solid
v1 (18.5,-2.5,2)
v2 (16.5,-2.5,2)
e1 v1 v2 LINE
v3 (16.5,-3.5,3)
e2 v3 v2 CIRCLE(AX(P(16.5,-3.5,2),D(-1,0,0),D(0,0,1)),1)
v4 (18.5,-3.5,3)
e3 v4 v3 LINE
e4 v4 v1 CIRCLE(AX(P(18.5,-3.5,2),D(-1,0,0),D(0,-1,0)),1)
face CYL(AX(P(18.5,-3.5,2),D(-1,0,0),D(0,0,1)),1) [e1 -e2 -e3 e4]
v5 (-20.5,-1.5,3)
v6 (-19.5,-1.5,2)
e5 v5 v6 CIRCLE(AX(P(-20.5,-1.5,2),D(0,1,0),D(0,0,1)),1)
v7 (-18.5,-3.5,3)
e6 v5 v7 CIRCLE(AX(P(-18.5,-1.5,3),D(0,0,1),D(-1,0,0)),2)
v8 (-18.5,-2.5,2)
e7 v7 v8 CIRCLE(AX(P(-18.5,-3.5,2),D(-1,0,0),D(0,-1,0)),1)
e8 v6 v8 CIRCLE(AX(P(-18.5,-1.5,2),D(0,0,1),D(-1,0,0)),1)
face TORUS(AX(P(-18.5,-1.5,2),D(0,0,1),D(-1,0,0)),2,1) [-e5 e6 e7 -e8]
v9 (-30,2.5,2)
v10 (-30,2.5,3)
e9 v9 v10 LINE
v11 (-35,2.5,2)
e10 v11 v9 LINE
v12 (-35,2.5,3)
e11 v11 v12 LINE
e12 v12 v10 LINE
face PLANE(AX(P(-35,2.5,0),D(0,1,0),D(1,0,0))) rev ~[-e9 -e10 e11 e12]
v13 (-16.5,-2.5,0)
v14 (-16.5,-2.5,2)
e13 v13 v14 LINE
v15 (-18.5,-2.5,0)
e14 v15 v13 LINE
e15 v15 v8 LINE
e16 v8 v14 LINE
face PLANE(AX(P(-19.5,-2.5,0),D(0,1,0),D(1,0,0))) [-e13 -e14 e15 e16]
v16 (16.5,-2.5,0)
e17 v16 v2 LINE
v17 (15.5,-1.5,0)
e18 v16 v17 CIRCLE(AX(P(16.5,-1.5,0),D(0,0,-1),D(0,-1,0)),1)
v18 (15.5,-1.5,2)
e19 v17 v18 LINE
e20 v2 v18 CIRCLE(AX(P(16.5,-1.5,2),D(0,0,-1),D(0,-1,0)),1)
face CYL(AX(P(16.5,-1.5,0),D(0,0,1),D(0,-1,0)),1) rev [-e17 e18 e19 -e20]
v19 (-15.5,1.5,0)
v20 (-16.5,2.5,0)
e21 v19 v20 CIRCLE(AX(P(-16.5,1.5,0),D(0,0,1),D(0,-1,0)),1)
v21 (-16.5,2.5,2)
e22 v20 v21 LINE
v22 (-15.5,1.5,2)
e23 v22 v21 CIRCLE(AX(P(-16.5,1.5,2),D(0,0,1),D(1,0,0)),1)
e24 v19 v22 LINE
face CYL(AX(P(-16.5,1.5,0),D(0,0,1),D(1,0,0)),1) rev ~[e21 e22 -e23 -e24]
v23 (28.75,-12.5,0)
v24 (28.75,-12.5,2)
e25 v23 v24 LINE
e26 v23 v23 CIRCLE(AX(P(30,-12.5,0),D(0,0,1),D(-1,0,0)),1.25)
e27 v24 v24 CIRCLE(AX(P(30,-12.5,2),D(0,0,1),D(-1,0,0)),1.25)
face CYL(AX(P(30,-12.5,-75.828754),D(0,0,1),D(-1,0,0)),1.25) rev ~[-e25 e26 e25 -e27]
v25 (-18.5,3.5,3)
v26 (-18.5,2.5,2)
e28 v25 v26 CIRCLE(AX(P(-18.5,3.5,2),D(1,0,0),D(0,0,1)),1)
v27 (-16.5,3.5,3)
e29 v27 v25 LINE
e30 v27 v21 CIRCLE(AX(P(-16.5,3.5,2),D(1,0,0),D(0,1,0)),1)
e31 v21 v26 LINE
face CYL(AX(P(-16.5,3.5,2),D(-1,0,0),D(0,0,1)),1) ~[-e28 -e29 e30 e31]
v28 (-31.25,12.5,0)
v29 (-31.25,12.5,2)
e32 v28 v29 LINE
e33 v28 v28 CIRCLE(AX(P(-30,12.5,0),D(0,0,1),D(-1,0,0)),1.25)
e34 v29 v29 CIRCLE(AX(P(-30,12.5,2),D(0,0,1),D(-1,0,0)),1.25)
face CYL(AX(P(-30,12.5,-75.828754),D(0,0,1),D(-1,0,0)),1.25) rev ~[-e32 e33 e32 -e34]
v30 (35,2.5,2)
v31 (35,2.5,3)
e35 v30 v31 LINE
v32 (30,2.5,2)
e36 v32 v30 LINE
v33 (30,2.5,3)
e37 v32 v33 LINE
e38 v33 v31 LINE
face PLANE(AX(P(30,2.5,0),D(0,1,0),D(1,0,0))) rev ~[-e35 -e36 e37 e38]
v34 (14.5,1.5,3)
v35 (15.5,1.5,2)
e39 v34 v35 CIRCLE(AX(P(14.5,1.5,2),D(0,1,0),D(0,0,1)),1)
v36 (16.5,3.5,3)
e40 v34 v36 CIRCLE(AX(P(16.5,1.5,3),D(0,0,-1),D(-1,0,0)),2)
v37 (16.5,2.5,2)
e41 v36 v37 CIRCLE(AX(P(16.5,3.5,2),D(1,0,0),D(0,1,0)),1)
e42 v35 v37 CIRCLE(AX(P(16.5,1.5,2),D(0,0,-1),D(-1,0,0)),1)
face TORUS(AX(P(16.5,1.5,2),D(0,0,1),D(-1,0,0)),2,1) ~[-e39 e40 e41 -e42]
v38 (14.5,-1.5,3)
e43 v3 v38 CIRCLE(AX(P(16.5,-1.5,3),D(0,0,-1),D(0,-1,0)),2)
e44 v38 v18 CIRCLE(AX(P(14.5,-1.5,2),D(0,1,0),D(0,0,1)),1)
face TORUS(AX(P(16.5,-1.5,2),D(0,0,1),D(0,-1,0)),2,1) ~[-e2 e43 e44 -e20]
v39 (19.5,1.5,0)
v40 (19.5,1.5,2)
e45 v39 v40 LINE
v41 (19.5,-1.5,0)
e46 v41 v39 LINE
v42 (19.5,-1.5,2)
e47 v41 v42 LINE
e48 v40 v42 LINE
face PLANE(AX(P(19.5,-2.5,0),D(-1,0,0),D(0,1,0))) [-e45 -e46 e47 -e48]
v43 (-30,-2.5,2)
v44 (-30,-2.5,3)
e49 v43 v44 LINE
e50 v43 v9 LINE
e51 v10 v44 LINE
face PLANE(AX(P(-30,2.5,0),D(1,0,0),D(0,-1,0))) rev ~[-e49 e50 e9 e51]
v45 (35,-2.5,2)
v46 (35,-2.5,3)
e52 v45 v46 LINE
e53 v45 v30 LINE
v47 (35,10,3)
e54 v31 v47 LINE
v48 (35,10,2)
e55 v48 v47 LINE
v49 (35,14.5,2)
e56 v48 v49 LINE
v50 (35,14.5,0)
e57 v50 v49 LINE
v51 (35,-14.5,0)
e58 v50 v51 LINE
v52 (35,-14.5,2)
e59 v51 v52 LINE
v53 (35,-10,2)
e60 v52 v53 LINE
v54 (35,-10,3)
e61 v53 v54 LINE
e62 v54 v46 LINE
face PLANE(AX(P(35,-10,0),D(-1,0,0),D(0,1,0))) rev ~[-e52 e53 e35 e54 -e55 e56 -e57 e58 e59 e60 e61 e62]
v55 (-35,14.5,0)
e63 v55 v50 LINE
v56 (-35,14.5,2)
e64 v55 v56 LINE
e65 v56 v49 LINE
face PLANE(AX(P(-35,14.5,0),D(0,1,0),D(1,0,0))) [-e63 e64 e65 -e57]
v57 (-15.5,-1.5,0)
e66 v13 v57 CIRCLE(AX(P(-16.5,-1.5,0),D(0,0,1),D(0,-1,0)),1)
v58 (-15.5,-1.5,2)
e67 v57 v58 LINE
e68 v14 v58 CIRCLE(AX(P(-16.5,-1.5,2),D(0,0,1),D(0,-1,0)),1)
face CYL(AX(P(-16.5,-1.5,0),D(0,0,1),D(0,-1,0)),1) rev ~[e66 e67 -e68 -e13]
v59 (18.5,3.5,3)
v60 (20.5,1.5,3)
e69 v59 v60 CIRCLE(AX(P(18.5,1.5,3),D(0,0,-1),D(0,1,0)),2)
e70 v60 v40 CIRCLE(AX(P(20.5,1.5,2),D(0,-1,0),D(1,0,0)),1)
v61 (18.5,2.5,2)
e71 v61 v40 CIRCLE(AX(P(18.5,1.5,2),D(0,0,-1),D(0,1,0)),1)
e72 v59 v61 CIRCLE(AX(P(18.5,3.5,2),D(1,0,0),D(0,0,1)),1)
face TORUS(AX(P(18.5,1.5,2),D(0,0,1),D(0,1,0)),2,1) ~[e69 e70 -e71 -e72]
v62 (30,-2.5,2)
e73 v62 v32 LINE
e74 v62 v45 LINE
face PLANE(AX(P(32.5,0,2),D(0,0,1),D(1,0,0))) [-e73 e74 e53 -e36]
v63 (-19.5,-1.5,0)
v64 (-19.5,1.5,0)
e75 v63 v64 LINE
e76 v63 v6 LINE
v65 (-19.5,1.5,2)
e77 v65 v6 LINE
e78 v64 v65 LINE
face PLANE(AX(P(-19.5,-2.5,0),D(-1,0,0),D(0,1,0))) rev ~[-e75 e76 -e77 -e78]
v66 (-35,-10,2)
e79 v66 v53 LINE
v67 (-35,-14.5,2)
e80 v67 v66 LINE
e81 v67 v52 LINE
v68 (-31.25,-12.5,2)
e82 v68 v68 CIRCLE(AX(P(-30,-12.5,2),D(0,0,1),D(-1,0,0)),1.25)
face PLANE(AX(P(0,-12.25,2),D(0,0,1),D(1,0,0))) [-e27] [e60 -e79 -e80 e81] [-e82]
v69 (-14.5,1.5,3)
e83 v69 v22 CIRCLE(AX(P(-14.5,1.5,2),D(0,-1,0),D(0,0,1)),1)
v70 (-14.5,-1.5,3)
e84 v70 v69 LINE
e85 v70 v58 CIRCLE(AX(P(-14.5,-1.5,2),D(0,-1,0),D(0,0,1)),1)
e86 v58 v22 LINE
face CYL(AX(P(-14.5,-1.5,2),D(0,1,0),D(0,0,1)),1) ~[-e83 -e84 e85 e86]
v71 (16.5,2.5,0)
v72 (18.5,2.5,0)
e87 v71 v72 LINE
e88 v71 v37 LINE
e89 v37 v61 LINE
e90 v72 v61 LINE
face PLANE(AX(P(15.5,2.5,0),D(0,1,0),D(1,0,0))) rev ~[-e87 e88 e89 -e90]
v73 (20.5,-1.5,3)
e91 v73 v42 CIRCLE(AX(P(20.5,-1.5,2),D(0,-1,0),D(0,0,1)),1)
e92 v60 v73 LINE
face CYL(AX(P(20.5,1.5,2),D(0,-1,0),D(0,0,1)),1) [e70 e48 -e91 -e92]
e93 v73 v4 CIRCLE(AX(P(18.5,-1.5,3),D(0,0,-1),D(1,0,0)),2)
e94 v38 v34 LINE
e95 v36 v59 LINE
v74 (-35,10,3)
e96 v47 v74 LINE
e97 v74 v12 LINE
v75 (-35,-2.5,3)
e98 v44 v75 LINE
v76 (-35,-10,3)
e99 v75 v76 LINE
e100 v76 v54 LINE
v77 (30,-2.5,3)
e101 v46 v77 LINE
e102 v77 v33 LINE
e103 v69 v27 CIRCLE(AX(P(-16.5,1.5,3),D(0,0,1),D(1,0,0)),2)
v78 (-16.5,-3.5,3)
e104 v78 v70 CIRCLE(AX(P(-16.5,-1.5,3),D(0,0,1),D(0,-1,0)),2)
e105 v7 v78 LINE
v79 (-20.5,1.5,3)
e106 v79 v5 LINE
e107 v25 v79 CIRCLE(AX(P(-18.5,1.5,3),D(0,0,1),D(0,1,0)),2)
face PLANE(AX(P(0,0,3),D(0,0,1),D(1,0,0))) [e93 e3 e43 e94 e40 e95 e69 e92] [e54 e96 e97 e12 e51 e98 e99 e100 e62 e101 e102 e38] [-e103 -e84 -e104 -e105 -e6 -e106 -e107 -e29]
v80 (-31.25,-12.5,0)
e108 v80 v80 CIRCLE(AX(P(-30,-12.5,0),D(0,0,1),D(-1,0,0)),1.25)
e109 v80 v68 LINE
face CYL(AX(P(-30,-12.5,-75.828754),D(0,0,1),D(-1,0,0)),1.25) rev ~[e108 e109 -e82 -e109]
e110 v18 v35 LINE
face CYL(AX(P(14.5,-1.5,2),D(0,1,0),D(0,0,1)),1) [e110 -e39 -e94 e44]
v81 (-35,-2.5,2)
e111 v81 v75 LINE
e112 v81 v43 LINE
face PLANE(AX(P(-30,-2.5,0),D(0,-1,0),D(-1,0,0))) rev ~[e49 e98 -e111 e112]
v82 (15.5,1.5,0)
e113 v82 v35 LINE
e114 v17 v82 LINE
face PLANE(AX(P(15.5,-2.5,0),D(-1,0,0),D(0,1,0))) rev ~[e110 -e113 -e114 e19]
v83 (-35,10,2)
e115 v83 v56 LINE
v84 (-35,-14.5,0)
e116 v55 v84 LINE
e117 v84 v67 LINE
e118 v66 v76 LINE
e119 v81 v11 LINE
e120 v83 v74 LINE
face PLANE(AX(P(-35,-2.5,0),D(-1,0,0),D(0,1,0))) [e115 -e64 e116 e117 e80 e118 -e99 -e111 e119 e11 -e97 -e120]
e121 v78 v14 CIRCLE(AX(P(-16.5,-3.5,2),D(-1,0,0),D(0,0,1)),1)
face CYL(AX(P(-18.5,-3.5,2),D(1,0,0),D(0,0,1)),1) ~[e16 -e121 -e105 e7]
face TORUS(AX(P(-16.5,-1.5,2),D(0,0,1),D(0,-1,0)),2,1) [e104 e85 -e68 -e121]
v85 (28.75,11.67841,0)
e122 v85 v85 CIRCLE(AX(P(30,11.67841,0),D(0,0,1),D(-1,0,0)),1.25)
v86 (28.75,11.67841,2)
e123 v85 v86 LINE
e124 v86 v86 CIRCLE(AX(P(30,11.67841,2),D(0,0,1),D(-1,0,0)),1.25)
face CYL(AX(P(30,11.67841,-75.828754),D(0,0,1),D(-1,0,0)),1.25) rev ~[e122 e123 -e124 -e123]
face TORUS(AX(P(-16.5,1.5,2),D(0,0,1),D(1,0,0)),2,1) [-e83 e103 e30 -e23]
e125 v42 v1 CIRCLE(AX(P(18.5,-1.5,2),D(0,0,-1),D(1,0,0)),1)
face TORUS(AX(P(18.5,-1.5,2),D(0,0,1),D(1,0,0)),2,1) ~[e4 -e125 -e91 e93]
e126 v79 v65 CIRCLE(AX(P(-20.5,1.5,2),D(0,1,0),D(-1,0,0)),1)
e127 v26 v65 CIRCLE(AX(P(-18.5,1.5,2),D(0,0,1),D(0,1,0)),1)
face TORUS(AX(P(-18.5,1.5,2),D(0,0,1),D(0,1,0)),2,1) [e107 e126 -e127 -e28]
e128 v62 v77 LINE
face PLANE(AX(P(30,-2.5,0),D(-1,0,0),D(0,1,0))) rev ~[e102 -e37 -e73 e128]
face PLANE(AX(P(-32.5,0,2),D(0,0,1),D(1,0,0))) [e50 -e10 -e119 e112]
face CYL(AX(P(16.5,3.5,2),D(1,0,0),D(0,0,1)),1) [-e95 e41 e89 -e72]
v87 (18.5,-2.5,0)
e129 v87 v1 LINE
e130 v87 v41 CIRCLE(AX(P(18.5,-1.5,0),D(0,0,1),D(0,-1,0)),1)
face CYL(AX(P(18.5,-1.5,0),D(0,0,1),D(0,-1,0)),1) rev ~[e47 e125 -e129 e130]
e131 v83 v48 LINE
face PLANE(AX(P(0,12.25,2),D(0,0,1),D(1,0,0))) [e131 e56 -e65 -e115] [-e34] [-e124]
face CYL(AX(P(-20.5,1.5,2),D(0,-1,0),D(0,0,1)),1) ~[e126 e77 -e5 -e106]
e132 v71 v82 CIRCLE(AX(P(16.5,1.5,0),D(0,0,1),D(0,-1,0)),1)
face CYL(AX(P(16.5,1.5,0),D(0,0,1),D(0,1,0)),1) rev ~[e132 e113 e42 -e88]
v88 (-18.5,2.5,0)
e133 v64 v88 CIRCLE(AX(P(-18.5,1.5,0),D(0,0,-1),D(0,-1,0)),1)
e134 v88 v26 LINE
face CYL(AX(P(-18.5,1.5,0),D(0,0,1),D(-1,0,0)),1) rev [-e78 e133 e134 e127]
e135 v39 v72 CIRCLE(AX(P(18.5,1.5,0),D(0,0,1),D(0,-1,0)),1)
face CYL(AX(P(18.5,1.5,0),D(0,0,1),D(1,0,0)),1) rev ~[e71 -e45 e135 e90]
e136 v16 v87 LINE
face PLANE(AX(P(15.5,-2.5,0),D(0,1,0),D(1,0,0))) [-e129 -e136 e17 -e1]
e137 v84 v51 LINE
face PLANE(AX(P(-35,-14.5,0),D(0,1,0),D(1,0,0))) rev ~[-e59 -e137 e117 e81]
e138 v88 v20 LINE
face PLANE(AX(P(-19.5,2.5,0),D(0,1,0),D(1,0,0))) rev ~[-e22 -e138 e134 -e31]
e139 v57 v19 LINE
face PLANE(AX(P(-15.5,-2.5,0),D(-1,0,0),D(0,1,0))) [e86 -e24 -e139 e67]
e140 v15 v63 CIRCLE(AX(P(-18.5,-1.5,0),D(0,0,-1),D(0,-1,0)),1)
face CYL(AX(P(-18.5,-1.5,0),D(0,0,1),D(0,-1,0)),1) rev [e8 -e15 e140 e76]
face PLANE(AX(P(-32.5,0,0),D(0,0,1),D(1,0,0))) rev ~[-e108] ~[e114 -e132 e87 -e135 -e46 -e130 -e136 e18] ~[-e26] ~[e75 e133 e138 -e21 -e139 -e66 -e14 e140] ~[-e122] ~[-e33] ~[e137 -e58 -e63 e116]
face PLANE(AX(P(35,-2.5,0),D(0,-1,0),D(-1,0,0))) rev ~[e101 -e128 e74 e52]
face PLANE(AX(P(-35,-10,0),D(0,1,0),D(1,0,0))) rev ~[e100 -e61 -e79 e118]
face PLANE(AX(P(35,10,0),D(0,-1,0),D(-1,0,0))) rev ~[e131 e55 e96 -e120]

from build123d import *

# Parameters (mm, degrees)
F0_W     = 4
F0_H     = 5
F1_DEPTH = 3
F0_W_2   = 5
F0_W_3   = 70
F0_H_2   = 4.5
F2_DEPTH = 2
F3_D     = 2.5
F4_F1_R  = 1
F4_F2_R  = 1


with BuildPart() as f1:
    # F0 (on Top) → F1 (new body)
    with BuildSketch(Plane.XY):
        Polygon((-35, -10), (35, -10), (35, -2.5), (30, -2.5), (30, 2.5), (35, 2.5), (35, 10), (-35, 10), (-35, 2.5), (-30, 2.5), (-30, -2.5), (-35, -2.5), align=None)
        with Locations((-17.5, 0)):
            Rectangle(F0_W, F0_H, mode=Mode.SUBTRACT)
        with Locations((17.5, 0)):
            Rectangle(F0_W, F0_H, mode=Mode.SUBTRACT)
    extrude(amount=F1_DEPTH)

    # F0 (on Top) → F2 (join)
    with BuildSketch(Plane.XY):
        with Locations((-32.5, 0)):
            Rectangle(F0_W_2, F0_H)
        with Locations((0, 12.25)):
            Rectangle(F0_W_3, F0_H_2)
        with Locations((0, -12.25)):
            Rectangle(F0_W_3, F0_H_2)
        with Locations((32.5, 0)):
            Rectangle(F0_W_2, F0_H)
    extrude(amount=F2_DEPTH)

    # F3 (through all)
    with Locations(Plane(origin=(0, 0, 0), x_dir=(1, 0, 0), z_dir=(0, 0, -1))):
        with Locations((-30, 12.5), (-30, -12.5), (30, -11.6784099489), (30, 12.5)):
            Hole(F3_D / 2)

    # F4: fillet of radius 1 on 12 edges, made by hand

    # F4_f1
    f4_f1_edges = [f1.edges().sort_by_distance(p)[0] for p in [
        (-19.5, 2.5, 1.5),
        (-15.5, 2.5, 1.5),
        (-15.5, -2.5, 1.5),
        (-19.5, -2.5, 1.5),
        (19.5, 2.5, 1.5),
        (19.5, -2.5, 1.5),
        (15.5, -2.5, 1.5),
        (15.5, 2.5, 1.5),
    ]]
    fillet(f4_f1_edges, radius=F4_F1_R)

    # F4_f2
    f4_f2_edges = [f1.edges().sort_by_distance(p)[0] for p in [
        (15.5, 0, 3),
        (-15.5, 0, 3),
        (-19.5, 0, 3),
        (19.5, 0, 3),
        (19.2071067812, 2.2071067812, 3),
        (19.2071067812, -2.2071067812, 3),
        (-19.2071067812, -2.2071067812, 3),
        (-19.2071067812, 2.2071067812, 3),
        (-15.7928932188, 2.2071067812, 3),
        (-15.7928932188, -2.2071067812, 3),
        (15.7928932188, -2.2071067812, 3),
        (15.7928932188, 2.2071067812, 3),
    ]]
    fillet(f4_f2_edges, radius=F4_F2_R)


solid = f1.part
